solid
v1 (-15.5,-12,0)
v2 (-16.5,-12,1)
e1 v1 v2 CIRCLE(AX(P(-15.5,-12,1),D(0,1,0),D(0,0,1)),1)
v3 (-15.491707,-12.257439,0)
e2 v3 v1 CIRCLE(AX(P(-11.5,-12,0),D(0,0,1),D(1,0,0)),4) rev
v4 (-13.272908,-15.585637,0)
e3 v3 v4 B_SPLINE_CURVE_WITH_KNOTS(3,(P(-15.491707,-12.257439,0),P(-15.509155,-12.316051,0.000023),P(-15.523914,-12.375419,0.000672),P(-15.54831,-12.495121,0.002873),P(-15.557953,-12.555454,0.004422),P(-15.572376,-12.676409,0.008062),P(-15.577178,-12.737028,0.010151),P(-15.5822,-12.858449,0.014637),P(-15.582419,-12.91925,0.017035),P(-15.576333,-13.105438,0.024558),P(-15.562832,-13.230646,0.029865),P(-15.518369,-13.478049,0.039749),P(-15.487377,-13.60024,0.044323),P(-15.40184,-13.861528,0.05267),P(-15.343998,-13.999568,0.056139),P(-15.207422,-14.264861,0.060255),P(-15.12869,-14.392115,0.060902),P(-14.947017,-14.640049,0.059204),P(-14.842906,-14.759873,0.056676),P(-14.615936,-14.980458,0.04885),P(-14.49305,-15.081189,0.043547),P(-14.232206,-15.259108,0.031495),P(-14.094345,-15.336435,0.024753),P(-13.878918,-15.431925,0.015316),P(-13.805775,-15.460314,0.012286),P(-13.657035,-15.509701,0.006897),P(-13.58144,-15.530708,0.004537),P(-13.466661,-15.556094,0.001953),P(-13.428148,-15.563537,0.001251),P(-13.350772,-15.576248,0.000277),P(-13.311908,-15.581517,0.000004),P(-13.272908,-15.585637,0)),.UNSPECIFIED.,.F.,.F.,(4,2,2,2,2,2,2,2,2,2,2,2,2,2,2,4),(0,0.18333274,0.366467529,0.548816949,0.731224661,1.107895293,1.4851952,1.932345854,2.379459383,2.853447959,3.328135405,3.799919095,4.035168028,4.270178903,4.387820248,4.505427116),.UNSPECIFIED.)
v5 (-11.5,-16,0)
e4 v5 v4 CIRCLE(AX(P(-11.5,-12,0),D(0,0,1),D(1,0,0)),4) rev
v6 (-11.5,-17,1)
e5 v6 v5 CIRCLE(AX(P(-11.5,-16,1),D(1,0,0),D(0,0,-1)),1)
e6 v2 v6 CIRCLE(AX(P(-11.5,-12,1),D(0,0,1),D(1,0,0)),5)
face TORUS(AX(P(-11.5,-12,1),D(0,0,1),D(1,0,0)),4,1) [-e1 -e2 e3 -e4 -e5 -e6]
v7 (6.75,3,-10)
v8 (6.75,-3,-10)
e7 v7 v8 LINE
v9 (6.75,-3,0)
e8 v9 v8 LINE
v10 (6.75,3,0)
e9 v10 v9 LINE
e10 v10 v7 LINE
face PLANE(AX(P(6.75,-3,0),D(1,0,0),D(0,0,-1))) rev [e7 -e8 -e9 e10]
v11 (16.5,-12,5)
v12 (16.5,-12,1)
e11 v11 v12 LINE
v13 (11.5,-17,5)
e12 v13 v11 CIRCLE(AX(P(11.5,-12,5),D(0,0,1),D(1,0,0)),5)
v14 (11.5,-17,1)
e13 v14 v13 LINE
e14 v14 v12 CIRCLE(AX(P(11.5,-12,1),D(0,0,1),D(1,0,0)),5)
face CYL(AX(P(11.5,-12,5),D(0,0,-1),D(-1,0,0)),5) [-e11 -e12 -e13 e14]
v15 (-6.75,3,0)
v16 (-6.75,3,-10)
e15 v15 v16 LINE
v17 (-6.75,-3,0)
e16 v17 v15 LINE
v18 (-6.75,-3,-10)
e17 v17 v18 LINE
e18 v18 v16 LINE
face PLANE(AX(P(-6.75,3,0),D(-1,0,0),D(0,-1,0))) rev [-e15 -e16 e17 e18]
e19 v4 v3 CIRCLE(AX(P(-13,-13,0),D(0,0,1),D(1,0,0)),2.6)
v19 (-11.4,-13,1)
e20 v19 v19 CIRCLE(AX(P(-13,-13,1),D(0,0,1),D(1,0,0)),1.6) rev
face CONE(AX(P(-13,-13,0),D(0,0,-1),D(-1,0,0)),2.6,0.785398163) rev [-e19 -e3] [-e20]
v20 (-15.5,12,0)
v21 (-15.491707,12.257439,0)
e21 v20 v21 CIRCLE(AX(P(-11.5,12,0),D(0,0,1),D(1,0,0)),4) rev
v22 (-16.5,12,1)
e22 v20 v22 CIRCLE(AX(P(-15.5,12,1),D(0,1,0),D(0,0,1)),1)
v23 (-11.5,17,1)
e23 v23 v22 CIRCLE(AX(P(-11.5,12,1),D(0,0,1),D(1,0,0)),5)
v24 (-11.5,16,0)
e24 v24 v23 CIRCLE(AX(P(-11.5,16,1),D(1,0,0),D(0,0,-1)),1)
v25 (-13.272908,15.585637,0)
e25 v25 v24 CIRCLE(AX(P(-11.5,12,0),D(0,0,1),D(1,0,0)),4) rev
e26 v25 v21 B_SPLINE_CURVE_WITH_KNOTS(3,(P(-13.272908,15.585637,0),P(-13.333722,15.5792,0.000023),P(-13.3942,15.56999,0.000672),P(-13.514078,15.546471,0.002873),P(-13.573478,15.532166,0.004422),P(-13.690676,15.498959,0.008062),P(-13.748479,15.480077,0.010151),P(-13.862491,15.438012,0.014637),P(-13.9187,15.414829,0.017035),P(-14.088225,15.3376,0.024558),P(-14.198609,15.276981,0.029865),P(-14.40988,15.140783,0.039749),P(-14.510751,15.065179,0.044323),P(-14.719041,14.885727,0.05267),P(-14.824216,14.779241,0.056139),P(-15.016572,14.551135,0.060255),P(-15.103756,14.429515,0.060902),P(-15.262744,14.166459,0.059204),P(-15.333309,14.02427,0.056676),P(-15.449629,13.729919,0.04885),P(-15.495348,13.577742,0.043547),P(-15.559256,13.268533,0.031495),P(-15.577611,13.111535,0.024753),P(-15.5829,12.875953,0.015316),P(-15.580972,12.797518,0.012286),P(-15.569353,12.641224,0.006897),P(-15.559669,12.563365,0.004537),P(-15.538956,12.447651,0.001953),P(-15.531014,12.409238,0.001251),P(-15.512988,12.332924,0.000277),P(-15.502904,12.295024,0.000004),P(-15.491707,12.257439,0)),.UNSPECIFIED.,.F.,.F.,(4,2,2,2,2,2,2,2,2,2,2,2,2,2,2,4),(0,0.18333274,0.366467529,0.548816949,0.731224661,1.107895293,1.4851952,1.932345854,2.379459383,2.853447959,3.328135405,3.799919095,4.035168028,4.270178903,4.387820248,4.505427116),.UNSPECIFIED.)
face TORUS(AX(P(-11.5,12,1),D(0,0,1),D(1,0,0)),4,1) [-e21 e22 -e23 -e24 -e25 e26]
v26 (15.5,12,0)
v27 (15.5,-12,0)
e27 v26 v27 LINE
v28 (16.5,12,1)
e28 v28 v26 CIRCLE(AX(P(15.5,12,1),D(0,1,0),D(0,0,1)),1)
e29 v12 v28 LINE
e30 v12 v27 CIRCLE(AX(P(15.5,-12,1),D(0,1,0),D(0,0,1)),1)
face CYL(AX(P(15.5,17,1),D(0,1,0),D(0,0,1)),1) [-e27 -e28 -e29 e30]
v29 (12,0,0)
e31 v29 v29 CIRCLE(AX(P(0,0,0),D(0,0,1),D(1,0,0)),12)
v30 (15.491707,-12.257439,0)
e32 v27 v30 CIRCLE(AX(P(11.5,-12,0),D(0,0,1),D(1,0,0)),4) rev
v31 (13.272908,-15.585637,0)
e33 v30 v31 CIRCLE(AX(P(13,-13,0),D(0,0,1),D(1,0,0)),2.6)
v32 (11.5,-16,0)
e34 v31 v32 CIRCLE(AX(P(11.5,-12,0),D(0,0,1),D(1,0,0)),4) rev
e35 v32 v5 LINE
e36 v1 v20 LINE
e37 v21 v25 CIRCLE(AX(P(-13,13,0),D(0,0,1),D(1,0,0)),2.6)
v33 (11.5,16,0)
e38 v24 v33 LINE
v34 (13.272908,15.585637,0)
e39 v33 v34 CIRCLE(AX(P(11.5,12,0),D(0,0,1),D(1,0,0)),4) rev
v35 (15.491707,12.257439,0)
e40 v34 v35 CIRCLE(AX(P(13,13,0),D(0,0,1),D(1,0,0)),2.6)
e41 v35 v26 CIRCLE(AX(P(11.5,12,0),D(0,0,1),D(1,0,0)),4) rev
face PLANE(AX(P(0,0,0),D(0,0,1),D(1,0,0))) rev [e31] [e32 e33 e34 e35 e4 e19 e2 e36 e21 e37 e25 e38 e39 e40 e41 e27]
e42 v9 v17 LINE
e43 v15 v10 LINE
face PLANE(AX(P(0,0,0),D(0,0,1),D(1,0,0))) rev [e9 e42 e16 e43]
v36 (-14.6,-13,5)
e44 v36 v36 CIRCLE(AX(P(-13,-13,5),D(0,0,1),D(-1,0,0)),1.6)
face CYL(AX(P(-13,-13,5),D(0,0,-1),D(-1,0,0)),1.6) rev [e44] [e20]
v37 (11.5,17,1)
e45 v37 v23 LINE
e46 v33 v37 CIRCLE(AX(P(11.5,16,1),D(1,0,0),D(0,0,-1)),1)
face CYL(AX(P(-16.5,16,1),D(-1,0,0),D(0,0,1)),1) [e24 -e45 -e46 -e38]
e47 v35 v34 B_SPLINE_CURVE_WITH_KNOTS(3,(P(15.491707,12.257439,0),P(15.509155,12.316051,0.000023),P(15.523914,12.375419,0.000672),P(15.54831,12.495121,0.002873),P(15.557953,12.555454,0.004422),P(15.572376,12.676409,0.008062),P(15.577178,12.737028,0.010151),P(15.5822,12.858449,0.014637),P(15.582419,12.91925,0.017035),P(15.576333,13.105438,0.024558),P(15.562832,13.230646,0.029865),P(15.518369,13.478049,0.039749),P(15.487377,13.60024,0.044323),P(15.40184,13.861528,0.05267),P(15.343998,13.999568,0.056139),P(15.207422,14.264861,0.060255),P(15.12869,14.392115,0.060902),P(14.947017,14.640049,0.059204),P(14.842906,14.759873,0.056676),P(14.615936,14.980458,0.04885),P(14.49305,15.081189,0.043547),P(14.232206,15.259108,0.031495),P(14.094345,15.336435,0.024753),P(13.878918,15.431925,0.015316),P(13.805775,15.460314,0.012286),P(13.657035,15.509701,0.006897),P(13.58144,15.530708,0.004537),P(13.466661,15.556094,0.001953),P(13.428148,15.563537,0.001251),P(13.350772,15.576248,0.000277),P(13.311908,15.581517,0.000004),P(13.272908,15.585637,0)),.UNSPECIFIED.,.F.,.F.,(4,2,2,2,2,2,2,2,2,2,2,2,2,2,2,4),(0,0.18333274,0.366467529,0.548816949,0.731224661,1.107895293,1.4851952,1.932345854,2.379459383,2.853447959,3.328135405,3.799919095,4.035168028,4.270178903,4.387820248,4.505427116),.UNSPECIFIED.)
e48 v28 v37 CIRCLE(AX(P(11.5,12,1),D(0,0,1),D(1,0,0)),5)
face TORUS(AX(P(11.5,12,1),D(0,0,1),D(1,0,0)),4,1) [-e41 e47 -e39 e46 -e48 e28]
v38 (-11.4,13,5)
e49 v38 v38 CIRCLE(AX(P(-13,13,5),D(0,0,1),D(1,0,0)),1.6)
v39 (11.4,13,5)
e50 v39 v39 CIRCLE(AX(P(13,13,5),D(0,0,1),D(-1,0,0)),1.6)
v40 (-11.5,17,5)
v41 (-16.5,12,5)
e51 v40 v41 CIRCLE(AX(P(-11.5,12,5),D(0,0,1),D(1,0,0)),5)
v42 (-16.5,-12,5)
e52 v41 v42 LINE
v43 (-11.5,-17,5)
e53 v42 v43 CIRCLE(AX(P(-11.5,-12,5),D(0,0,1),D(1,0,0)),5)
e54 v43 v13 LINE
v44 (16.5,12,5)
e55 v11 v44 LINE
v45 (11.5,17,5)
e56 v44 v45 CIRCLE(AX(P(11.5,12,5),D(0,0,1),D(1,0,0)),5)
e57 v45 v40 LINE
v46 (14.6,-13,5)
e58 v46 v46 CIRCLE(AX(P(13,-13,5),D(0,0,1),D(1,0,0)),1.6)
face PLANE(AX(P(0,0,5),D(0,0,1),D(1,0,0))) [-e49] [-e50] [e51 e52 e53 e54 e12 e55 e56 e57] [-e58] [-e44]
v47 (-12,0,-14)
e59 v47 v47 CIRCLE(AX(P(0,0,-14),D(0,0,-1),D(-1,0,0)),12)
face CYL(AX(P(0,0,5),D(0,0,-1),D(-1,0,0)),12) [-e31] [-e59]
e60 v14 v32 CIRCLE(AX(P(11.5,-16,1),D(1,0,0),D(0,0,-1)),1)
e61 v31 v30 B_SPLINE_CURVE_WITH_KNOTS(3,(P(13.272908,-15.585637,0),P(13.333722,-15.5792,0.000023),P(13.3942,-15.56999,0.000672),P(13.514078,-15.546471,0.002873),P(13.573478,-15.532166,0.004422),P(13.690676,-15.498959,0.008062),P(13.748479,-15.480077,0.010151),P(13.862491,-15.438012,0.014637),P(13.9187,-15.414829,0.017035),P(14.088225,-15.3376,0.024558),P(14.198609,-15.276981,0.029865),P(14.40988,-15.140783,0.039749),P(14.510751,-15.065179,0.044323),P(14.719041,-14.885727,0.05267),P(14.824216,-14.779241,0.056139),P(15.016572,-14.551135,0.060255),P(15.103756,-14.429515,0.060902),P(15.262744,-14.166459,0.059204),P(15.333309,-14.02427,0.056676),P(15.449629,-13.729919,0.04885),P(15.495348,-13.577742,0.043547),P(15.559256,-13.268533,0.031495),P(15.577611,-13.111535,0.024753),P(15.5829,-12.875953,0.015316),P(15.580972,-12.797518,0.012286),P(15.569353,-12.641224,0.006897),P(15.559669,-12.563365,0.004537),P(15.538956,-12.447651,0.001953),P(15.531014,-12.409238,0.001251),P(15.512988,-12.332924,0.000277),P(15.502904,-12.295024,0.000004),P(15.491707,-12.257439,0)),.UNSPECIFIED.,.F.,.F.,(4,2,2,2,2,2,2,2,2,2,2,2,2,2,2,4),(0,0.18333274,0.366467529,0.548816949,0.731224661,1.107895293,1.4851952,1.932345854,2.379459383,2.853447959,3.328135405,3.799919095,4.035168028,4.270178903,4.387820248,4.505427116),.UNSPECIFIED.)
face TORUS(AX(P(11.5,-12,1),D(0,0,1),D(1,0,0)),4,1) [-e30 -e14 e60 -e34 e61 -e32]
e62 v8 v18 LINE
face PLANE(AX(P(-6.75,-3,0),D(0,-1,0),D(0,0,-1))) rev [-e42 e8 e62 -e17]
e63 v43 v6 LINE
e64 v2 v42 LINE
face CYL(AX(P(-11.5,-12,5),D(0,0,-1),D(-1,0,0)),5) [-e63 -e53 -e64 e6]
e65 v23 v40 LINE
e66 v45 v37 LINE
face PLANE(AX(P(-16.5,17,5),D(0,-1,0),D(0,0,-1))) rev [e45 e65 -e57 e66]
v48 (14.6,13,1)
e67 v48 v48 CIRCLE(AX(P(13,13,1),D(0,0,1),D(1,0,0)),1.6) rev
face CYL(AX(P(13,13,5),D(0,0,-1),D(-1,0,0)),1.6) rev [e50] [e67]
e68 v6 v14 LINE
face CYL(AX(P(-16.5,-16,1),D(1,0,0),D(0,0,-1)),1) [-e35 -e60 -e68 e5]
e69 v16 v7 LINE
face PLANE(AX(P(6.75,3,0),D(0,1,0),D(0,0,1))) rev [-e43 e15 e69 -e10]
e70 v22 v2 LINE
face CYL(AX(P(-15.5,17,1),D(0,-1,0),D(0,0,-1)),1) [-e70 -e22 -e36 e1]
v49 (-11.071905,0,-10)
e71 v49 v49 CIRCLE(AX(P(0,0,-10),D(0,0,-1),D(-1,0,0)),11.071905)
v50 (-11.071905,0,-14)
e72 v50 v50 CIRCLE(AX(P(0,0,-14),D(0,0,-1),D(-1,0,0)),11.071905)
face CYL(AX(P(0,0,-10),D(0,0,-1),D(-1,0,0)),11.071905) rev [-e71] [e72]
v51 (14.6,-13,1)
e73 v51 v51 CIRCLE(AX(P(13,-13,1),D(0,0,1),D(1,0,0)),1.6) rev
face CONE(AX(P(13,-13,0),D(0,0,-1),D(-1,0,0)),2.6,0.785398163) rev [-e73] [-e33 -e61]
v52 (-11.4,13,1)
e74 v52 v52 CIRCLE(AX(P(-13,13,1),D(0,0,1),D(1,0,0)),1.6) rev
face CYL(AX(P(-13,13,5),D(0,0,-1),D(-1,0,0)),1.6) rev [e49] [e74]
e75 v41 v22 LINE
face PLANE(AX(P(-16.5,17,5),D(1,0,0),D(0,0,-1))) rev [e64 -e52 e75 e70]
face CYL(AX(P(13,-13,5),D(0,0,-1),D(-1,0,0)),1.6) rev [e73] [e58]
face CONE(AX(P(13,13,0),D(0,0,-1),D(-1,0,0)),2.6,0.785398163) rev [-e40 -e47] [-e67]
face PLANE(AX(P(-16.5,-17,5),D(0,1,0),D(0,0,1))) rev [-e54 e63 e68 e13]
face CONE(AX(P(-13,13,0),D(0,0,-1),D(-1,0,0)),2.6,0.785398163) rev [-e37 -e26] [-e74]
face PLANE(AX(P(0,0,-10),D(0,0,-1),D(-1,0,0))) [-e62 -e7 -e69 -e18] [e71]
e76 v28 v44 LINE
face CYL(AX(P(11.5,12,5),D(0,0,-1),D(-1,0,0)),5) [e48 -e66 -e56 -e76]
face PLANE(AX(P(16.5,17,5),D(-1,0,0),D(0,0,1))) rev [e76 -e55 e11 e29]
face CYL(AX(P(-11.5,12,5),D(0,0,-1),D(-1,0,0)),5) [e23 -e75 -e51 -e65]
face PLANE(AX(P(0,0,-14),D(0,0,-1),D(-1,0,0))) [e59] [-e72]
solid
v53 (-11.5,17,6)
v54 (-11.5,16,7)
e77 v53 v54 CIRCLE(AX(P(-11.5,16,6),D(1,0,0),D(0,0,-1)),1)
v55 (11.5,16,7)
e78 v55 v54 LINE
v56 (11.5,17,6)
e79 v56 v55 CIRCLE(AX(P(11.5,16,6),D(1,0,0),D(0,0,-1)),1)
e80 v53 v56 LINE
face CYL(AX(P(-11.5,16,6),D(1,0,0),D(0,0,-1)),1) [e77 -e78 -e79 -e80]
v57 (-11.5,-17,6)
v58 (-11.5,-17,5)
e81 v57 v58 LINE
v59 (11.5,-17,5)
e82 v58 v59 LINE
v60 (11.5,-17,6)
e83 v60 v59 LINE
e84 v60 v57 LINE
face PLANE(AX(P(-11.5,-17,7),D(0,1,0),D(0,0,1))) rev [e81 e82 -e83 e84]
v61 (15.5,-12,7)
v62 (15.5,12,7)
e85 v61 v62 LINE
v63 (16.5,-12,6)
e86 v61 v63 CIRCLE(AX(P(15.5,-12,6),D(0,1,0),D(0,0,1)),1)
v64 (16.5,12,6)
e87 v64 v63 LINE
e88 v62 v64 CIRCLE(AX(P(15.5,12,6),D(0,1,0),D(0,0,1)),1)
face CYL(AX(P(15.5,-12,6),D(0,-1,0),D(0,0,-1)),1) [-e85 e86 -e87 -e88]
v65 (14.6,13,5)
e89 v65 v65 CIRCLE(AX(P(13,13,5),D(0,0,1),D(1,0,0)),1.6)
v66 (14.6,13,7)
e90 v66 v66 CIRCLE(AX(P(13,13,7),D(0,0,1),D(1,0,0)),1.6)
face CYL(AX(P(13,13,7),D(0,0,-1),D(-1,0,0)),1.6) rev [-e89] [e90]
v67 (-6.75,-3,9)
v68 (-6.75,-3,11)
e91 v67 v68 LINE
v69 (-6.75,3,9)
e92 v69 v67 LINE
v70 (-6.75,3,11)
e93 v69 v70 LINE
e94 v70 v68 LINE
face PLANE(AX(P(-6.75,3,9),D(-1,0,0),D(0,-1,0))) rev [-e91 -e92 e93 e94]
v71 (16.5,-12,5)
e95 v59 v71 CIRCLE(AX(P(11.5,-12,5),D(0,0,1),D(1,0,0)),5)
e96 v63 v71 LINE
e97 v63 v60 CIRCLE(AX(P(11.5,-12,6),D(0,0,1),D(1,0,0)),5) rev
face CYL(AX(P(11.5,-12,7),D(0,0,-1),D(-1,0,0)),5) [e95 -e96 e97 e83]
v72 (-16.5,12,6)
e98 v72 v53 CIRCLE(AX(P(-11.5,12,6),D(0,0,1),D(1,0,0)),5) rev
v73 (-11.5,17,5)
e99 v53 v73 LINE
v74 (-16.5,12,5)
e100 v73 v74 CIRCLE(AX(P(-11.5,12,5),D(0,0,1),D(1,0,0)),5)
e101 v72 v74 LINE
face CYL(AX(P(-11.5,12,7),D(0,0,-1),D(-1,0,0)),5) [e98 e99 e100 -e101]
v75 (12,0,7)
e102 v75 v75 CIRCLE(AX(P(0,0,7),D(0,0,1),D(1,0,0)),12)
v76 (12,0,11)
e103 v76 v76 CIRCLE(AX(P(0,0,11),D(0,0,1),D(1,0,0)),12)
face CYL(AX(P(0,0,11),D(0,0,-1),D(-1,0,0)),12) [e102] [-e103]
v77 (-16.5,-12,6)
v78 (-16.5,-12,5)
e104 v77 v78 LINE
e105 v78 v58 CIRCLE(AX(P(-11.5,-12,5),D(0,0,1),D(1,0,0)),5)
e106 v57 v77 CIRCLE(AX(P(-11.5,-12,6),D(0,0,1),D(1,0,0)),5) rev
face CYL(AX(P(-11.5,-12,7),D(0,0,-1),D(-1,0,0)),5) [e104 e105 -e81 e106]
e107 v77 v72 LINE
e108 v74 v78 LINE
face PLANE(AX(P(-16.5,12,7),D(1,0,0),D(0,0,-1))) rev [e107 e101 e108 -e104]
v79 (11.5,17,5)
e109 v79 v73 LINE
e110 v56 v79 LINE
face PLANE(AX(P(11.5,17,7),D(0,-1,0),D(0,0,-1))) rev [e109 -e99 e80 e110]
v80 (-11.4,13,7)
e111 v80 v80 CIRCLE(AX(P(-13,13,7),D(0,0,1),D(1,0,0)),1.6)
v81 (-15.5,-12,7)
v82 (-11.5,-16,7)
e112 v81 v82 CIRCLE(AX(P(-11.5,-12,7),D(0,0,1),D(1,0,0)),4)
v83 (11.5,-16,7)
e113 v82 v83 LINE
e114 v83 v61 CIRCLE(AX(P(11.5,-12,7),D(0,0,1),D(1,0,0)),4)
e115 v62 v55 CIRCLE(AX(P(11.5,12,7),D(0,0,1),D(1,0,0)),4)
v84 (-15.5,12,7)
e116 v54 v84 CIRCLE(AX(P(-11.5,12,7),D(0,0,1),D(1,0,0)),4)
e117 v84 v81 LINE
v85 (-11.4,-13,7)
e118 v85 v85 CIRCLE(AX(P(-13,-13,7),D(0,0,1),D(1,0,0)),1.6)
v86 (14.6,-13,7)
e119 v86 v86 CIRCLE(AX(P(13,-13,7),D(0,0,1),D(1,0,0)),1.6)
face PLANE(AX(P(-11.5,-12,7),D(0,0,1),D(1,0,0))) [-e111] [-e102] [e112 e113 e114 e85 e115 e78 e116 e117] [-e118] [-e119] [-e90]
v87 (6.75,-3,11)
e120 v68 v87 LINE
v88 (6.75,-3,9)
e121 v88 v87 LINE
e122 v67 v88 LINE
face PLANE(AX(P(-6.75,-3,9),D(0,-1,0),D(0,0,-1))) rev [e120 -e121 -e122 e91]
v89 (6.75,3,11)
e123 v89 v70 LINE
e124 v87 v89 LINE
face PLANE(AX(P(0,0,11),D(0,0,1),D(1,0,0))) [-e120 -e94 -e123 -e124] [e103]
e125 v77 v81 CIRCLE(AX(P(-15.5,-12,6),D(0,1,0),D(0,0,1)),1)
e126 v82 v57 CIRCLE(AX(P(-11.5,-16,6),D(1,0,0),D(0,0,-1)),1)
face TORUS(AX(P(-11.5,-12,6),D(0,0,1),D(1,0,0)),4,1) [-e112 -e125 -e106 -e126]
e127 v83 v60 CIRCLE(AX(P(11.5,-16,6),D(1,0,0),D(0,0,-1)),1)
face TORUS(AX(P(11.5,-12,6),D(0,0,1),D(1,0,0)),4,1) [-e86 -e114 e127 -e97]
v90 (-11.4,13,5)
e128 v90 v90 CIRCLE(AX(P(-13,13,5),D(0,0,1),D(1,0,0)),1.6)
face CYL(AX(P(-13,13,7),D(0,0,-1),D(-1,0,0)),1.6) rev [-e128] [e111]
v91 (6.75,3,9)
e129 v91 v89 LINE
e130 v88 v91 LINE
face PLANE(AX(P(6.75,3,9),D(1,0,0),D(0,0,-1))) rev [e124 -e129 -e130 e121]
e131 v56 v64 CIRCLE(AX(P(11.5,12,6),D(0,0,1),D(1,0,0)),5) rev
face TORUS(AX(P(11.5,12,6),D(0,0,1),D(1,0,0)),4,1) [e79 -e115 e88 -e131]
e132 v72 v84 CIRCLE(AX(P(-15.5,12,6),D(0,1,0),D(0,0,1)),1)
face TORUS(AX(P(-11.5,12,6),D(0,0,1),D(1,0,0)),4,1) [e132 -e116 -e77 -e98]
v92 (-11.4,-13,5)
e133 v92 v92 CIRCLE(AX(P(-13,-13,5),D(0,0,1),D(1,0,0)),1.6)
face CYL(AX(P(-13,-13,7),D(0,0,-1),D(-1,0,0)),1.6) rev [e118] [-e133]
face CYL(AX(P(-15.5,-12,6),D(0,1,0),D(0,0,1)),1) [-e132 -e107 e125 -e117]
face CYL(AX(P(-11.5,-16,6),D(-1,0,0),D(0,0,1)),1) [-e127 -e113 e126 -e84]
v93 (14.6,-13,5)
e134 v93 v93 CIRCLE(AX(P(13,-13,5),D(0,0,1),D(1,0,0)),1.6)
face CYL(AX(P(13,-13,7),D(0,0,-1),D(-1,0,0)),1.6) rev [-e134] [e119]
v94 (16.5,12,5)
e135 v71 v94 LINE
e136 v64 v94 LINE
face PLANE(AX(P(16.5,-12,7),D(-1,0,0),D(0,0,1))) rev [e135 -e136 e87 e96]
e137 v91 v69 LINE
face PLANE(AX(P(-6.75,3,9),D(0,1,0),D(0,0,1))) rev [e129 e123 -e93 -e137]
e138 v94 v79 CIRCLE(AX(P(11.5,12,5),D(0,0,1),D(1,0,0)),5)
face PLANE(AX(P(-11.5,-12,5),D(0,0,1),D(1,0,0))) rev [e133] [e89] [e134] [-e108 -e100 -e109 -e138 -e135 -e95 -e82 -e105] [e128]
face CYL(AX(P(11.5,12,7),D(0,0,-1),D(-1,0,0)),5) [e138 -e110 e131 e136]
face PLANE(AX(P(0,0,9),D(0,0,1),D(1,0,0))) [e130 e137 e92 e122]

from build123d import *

# Parameters (mm, degrees)
SKETCH1_W                = 33
SKETCH1_H                = 34
SKETCH1_R                = 12
SKETCH1_R_2              = 1.6
BOSS_EXTRUDE1_DEPTH      = 5
FILLET1_R                = 5
BOSS_EXTRUDE2_DEPTH      = 14
BOSS_EXTRUDE2_DEPTH_BACK = 5
SKETCH2_R                = 12
SKETCH3_R                = 1.6
BOSS_EXTRUDE3_DEPTH      = 2
FILLET2_R                = 1
FILLET3_R                = 1
CHAMFER1_SIZE            = 1
BOSS_EXTRUDE4_START      = 4
SKETCH4_R                = 12
BOSS_EXTRUDE4_DEPTH      = 4
SKETCH5_R                = 11.071904539
CUT_EXTRUDE1_DEPTH       = 4
SKETCH6_W                = 13.5
SKETCH6_H                = 6
CUT_EXTRUDE2_DEPTH       = 2
SKETCH7_W                = 13.5
SKETCH7_H                = 6
CUT_EXTRUDE3_DEPTH       = 10


with BuildPart() as part:
    # Sketch1 → Boss-Extrude1 (new body)
    with BuildSketch(Plane.XY):
        Rectangle(SKETCH1_W, SKETCH1_H)
        Circle(SKETCH1_R, mode=Mode.SUBTRACT)
        with Locations((-13, 13)):
            Circle(SKETCH1_R_2, mode=Mode.SUBTRACT)
        with Locations((13, -13)):
            Circle(SKETCH1_R_2, mode=Mode.SUBTRACT)
        with Locations(Location((13, 13, 0), (0, 0, 180))):
            Circle(SKETCH1_R_2, mode=Mode.SUBTRACT)
        with Locations(Location((-13, -13, 0), (0, 0, 180))):
            Circle(SKETCH1_R_2, mode=Mode.SUBTRACT)
    extrude(amount=BOSS_EXTRUDE1_DEPTH)

    # Fillet1
    fillet1_edges = [part.edges().sort_by_distance(p)[0] for p in [
        (16.5, -17, 2.5),
        (-16.5, -17, 2.5),
        (-16.5, 17, 2.5),
        (16.5, 17, 2.5),
    ]]
    fillet(fillet1_edges, radius=FILLET1_R)

    # Sketch2 → Boss-Extrude2 (add, two sides: drawn at the far end of the back side and taken through both)
    with BuildSketch(Plane(origin=(0, 0, 0), x_dir=(-1, 0, 0), z_dir=(0, 0, -1)).offset(-BOSS_EXTRUDE2_DEPTH_BACK)):
        Circle(SKETCH2_R)
    extrude(amount=BOSS_EXTRUDE2_DEPTH + BOSS_EXTRUDE2_DEPTH_BACK)

    # Fillet2
    fillet2_edges = [part.edges().sort_by_distance(p)[0] for p in [
        (-16.5, 0, 0),
        (16.5, 0, 0),
        (0, -17, 0),
        (0, 17, 0),
        (15.035533906, 15.535533906, 0),
        (15.035533906, -15.535533906, 0),
        (-15.035533906, -15.535533906, 0),
        (-15.035533906, 15.535533906, 0),
    ]]
    fillet(fillet2_edges, radius=FILLET2_R)

    # Chamfer1
    # the kernel refuses this chamfer: 1 mm, written as the material it takes off along each edge
    with BuildSketch(Plane(origin=(-13, 13, 0), x_dir=(1, 0, 0), z_dir=(0, -1, 0))) as chamfer1_piece_1:
        Polygon((1.6 + CHAMFER1_SIZE, 0), (1.6, CHAMFER1_SIZE), (1.6, 0), align=None)
    revolve(axis=Axis((-13, 13, 0), (0, 0, 1)), mode=Mode.SUBTRACT)
    with BuildSketch(Plane(origin=(13, -13, 0), x_dir=(1, 0, 0), z_dir=(0, -1, 0))) as chamfer1_piece_2:
        Polygon((1.6 + CHAMFER1_SIZE, 0), (1.6, CHAMFER1_SIZE), (1.6, 0), align=None)
    revolve(axis=Axis((13, -13, 0), (0, 0, 1)), mode=Mode.SUBTRACT)
    with BuildSketch(Plane(origin=(13, 13, 0), x_dir=(-1, 0, 0), z_dir=(0, 1, 0))) as chamfer1_piece_3:
        Polygon((1.6 + CHAMFER1_SIZE, 0), (1.6, CHAMFER1_SIZE), (1.6, 0), align=None)
    revolve(axis=Axis((13, 13, 0), (0, 0, 1)), mode=Mode.SUBTRACT)
    with BuildSketch(Plane(origin=(-13, -13, 0), x_dir=(-1, 0, 0), z_dir=(0, 1, 0))) as chamfer1_piece_4:
        Polygon((1.6 + CHAMFER1_SIZE, 0), (1.6, CHAMFER1_SIZE), (1.6, 0), align=None)
    revolve(axis=Axis((-13, -13, 0), (0, 0, 1)), mode=Mode.SUBTRACT)

    # Sketch5 → Cut-Extrude1 (cut)
    with BuildSketch(Plane(origin=(0, 0, -14), x_dir=(-1, 0, 0), z_dir=(0, 0, -1))):
        Circle(SKETCH5_R)
    extrude(amount=-CUT_EXTRUDE1_DEPTH, mode=Mode.SUBTRACT)

    # Sketch7 → Cut-Extrude3 (cut)
    with BuildSketch(Plane(origin=(0, 0, -10), x_dir=(-1, 0, 0), z_dir=(0, 0, -1))):
        Rectangle(SKETCH7_W, SKETCH7_H)
    extrude(amount=-CUT_EXTRUDE3_DEPTH, mode=Mode.SUBTRACT)


with BuildPart() as body_2:
    # Sketch3 → Boss-Extrude3 (new body)
    with BuildSketch(Plane.XY.offset(5)):
        with BuildLine():
            Line((-11.5, -17), (11.5, -17))
            ThreePointArc((11.5, -17), (15.035533906, -15.535533906), (16.5, -12))
            Line((16.5, -12), (16.5, 12))
            ThreePointArc((16.5, 12), (15.035533906, 15.535533906), (11.5, 17))
            Line((11.5, 17), (-11.5, 17))
            ThreePointArc((-11.5, 17), (-15.035533906, 15.535533906), (-16.5, 12))
            Line((-16.5, 12), (-16.5, -12))
            ThreePointArc((-16.5, -12), (-15.035533906, -15.535533906), (-11.5, -17))
        make_face()
        with Locations((-13, 13)):
            Circle(SKETCH3_R, mode=Mode.SUBTRACT)
        with Locations((13, 13)):
            Circle(SKETCH3_R, mode=Mode.SUBTRACT)
        with Locations((13, -13)):
            Circle(SKETCH3_R, mode=Mode.SUBTRACT)
        with Locations((-13, -13)):
            Circle(SKETCH3_R, mode=Mode.SUBTRACT)
    extrude(amount=BOSS_EXTRUDE3_DEPTH)

    # Fillet3
    fillet3_edges = [body_2.edges().sort_by_distance(p)[0] for p in [
        (15.035533906, -15.535533906, 7),
        (16.5, 0, 7),
        (15.035533906, 15.535533906, 7),
        (0, 17, 7),
        (-15.035533906, 15.535533906, 7),
        (-16.5, 0, 7),
        (-15.035533906, -15.535533906, 7),
        (0, -17, 7),
    ]]
    fillet(fillet3_edges, radius=FILLET3_R)

    # Sketch4 → Boss-Extrude4 (add)
    with BuildSketch(Plane.XY.offset(7).offset(BOSS_EXTRUDE4_START)):
        Circle(SKETCH4_R)
    extrude(amount=-BOSS_EXTRUDE4_DEPTH)

    # Sketch6 → Cut-Extrude2 (cut)
    with BuildSketch(Plane.XY.offset(11)):
        Rectangle(SKETCH6_W, SKETCH6_H)
    extrude(amount=-CUT_EXTRUDE2_DEPTH, mode=Mode.SUBTRACT)


solid = Compound([part.part, body_2.part])
